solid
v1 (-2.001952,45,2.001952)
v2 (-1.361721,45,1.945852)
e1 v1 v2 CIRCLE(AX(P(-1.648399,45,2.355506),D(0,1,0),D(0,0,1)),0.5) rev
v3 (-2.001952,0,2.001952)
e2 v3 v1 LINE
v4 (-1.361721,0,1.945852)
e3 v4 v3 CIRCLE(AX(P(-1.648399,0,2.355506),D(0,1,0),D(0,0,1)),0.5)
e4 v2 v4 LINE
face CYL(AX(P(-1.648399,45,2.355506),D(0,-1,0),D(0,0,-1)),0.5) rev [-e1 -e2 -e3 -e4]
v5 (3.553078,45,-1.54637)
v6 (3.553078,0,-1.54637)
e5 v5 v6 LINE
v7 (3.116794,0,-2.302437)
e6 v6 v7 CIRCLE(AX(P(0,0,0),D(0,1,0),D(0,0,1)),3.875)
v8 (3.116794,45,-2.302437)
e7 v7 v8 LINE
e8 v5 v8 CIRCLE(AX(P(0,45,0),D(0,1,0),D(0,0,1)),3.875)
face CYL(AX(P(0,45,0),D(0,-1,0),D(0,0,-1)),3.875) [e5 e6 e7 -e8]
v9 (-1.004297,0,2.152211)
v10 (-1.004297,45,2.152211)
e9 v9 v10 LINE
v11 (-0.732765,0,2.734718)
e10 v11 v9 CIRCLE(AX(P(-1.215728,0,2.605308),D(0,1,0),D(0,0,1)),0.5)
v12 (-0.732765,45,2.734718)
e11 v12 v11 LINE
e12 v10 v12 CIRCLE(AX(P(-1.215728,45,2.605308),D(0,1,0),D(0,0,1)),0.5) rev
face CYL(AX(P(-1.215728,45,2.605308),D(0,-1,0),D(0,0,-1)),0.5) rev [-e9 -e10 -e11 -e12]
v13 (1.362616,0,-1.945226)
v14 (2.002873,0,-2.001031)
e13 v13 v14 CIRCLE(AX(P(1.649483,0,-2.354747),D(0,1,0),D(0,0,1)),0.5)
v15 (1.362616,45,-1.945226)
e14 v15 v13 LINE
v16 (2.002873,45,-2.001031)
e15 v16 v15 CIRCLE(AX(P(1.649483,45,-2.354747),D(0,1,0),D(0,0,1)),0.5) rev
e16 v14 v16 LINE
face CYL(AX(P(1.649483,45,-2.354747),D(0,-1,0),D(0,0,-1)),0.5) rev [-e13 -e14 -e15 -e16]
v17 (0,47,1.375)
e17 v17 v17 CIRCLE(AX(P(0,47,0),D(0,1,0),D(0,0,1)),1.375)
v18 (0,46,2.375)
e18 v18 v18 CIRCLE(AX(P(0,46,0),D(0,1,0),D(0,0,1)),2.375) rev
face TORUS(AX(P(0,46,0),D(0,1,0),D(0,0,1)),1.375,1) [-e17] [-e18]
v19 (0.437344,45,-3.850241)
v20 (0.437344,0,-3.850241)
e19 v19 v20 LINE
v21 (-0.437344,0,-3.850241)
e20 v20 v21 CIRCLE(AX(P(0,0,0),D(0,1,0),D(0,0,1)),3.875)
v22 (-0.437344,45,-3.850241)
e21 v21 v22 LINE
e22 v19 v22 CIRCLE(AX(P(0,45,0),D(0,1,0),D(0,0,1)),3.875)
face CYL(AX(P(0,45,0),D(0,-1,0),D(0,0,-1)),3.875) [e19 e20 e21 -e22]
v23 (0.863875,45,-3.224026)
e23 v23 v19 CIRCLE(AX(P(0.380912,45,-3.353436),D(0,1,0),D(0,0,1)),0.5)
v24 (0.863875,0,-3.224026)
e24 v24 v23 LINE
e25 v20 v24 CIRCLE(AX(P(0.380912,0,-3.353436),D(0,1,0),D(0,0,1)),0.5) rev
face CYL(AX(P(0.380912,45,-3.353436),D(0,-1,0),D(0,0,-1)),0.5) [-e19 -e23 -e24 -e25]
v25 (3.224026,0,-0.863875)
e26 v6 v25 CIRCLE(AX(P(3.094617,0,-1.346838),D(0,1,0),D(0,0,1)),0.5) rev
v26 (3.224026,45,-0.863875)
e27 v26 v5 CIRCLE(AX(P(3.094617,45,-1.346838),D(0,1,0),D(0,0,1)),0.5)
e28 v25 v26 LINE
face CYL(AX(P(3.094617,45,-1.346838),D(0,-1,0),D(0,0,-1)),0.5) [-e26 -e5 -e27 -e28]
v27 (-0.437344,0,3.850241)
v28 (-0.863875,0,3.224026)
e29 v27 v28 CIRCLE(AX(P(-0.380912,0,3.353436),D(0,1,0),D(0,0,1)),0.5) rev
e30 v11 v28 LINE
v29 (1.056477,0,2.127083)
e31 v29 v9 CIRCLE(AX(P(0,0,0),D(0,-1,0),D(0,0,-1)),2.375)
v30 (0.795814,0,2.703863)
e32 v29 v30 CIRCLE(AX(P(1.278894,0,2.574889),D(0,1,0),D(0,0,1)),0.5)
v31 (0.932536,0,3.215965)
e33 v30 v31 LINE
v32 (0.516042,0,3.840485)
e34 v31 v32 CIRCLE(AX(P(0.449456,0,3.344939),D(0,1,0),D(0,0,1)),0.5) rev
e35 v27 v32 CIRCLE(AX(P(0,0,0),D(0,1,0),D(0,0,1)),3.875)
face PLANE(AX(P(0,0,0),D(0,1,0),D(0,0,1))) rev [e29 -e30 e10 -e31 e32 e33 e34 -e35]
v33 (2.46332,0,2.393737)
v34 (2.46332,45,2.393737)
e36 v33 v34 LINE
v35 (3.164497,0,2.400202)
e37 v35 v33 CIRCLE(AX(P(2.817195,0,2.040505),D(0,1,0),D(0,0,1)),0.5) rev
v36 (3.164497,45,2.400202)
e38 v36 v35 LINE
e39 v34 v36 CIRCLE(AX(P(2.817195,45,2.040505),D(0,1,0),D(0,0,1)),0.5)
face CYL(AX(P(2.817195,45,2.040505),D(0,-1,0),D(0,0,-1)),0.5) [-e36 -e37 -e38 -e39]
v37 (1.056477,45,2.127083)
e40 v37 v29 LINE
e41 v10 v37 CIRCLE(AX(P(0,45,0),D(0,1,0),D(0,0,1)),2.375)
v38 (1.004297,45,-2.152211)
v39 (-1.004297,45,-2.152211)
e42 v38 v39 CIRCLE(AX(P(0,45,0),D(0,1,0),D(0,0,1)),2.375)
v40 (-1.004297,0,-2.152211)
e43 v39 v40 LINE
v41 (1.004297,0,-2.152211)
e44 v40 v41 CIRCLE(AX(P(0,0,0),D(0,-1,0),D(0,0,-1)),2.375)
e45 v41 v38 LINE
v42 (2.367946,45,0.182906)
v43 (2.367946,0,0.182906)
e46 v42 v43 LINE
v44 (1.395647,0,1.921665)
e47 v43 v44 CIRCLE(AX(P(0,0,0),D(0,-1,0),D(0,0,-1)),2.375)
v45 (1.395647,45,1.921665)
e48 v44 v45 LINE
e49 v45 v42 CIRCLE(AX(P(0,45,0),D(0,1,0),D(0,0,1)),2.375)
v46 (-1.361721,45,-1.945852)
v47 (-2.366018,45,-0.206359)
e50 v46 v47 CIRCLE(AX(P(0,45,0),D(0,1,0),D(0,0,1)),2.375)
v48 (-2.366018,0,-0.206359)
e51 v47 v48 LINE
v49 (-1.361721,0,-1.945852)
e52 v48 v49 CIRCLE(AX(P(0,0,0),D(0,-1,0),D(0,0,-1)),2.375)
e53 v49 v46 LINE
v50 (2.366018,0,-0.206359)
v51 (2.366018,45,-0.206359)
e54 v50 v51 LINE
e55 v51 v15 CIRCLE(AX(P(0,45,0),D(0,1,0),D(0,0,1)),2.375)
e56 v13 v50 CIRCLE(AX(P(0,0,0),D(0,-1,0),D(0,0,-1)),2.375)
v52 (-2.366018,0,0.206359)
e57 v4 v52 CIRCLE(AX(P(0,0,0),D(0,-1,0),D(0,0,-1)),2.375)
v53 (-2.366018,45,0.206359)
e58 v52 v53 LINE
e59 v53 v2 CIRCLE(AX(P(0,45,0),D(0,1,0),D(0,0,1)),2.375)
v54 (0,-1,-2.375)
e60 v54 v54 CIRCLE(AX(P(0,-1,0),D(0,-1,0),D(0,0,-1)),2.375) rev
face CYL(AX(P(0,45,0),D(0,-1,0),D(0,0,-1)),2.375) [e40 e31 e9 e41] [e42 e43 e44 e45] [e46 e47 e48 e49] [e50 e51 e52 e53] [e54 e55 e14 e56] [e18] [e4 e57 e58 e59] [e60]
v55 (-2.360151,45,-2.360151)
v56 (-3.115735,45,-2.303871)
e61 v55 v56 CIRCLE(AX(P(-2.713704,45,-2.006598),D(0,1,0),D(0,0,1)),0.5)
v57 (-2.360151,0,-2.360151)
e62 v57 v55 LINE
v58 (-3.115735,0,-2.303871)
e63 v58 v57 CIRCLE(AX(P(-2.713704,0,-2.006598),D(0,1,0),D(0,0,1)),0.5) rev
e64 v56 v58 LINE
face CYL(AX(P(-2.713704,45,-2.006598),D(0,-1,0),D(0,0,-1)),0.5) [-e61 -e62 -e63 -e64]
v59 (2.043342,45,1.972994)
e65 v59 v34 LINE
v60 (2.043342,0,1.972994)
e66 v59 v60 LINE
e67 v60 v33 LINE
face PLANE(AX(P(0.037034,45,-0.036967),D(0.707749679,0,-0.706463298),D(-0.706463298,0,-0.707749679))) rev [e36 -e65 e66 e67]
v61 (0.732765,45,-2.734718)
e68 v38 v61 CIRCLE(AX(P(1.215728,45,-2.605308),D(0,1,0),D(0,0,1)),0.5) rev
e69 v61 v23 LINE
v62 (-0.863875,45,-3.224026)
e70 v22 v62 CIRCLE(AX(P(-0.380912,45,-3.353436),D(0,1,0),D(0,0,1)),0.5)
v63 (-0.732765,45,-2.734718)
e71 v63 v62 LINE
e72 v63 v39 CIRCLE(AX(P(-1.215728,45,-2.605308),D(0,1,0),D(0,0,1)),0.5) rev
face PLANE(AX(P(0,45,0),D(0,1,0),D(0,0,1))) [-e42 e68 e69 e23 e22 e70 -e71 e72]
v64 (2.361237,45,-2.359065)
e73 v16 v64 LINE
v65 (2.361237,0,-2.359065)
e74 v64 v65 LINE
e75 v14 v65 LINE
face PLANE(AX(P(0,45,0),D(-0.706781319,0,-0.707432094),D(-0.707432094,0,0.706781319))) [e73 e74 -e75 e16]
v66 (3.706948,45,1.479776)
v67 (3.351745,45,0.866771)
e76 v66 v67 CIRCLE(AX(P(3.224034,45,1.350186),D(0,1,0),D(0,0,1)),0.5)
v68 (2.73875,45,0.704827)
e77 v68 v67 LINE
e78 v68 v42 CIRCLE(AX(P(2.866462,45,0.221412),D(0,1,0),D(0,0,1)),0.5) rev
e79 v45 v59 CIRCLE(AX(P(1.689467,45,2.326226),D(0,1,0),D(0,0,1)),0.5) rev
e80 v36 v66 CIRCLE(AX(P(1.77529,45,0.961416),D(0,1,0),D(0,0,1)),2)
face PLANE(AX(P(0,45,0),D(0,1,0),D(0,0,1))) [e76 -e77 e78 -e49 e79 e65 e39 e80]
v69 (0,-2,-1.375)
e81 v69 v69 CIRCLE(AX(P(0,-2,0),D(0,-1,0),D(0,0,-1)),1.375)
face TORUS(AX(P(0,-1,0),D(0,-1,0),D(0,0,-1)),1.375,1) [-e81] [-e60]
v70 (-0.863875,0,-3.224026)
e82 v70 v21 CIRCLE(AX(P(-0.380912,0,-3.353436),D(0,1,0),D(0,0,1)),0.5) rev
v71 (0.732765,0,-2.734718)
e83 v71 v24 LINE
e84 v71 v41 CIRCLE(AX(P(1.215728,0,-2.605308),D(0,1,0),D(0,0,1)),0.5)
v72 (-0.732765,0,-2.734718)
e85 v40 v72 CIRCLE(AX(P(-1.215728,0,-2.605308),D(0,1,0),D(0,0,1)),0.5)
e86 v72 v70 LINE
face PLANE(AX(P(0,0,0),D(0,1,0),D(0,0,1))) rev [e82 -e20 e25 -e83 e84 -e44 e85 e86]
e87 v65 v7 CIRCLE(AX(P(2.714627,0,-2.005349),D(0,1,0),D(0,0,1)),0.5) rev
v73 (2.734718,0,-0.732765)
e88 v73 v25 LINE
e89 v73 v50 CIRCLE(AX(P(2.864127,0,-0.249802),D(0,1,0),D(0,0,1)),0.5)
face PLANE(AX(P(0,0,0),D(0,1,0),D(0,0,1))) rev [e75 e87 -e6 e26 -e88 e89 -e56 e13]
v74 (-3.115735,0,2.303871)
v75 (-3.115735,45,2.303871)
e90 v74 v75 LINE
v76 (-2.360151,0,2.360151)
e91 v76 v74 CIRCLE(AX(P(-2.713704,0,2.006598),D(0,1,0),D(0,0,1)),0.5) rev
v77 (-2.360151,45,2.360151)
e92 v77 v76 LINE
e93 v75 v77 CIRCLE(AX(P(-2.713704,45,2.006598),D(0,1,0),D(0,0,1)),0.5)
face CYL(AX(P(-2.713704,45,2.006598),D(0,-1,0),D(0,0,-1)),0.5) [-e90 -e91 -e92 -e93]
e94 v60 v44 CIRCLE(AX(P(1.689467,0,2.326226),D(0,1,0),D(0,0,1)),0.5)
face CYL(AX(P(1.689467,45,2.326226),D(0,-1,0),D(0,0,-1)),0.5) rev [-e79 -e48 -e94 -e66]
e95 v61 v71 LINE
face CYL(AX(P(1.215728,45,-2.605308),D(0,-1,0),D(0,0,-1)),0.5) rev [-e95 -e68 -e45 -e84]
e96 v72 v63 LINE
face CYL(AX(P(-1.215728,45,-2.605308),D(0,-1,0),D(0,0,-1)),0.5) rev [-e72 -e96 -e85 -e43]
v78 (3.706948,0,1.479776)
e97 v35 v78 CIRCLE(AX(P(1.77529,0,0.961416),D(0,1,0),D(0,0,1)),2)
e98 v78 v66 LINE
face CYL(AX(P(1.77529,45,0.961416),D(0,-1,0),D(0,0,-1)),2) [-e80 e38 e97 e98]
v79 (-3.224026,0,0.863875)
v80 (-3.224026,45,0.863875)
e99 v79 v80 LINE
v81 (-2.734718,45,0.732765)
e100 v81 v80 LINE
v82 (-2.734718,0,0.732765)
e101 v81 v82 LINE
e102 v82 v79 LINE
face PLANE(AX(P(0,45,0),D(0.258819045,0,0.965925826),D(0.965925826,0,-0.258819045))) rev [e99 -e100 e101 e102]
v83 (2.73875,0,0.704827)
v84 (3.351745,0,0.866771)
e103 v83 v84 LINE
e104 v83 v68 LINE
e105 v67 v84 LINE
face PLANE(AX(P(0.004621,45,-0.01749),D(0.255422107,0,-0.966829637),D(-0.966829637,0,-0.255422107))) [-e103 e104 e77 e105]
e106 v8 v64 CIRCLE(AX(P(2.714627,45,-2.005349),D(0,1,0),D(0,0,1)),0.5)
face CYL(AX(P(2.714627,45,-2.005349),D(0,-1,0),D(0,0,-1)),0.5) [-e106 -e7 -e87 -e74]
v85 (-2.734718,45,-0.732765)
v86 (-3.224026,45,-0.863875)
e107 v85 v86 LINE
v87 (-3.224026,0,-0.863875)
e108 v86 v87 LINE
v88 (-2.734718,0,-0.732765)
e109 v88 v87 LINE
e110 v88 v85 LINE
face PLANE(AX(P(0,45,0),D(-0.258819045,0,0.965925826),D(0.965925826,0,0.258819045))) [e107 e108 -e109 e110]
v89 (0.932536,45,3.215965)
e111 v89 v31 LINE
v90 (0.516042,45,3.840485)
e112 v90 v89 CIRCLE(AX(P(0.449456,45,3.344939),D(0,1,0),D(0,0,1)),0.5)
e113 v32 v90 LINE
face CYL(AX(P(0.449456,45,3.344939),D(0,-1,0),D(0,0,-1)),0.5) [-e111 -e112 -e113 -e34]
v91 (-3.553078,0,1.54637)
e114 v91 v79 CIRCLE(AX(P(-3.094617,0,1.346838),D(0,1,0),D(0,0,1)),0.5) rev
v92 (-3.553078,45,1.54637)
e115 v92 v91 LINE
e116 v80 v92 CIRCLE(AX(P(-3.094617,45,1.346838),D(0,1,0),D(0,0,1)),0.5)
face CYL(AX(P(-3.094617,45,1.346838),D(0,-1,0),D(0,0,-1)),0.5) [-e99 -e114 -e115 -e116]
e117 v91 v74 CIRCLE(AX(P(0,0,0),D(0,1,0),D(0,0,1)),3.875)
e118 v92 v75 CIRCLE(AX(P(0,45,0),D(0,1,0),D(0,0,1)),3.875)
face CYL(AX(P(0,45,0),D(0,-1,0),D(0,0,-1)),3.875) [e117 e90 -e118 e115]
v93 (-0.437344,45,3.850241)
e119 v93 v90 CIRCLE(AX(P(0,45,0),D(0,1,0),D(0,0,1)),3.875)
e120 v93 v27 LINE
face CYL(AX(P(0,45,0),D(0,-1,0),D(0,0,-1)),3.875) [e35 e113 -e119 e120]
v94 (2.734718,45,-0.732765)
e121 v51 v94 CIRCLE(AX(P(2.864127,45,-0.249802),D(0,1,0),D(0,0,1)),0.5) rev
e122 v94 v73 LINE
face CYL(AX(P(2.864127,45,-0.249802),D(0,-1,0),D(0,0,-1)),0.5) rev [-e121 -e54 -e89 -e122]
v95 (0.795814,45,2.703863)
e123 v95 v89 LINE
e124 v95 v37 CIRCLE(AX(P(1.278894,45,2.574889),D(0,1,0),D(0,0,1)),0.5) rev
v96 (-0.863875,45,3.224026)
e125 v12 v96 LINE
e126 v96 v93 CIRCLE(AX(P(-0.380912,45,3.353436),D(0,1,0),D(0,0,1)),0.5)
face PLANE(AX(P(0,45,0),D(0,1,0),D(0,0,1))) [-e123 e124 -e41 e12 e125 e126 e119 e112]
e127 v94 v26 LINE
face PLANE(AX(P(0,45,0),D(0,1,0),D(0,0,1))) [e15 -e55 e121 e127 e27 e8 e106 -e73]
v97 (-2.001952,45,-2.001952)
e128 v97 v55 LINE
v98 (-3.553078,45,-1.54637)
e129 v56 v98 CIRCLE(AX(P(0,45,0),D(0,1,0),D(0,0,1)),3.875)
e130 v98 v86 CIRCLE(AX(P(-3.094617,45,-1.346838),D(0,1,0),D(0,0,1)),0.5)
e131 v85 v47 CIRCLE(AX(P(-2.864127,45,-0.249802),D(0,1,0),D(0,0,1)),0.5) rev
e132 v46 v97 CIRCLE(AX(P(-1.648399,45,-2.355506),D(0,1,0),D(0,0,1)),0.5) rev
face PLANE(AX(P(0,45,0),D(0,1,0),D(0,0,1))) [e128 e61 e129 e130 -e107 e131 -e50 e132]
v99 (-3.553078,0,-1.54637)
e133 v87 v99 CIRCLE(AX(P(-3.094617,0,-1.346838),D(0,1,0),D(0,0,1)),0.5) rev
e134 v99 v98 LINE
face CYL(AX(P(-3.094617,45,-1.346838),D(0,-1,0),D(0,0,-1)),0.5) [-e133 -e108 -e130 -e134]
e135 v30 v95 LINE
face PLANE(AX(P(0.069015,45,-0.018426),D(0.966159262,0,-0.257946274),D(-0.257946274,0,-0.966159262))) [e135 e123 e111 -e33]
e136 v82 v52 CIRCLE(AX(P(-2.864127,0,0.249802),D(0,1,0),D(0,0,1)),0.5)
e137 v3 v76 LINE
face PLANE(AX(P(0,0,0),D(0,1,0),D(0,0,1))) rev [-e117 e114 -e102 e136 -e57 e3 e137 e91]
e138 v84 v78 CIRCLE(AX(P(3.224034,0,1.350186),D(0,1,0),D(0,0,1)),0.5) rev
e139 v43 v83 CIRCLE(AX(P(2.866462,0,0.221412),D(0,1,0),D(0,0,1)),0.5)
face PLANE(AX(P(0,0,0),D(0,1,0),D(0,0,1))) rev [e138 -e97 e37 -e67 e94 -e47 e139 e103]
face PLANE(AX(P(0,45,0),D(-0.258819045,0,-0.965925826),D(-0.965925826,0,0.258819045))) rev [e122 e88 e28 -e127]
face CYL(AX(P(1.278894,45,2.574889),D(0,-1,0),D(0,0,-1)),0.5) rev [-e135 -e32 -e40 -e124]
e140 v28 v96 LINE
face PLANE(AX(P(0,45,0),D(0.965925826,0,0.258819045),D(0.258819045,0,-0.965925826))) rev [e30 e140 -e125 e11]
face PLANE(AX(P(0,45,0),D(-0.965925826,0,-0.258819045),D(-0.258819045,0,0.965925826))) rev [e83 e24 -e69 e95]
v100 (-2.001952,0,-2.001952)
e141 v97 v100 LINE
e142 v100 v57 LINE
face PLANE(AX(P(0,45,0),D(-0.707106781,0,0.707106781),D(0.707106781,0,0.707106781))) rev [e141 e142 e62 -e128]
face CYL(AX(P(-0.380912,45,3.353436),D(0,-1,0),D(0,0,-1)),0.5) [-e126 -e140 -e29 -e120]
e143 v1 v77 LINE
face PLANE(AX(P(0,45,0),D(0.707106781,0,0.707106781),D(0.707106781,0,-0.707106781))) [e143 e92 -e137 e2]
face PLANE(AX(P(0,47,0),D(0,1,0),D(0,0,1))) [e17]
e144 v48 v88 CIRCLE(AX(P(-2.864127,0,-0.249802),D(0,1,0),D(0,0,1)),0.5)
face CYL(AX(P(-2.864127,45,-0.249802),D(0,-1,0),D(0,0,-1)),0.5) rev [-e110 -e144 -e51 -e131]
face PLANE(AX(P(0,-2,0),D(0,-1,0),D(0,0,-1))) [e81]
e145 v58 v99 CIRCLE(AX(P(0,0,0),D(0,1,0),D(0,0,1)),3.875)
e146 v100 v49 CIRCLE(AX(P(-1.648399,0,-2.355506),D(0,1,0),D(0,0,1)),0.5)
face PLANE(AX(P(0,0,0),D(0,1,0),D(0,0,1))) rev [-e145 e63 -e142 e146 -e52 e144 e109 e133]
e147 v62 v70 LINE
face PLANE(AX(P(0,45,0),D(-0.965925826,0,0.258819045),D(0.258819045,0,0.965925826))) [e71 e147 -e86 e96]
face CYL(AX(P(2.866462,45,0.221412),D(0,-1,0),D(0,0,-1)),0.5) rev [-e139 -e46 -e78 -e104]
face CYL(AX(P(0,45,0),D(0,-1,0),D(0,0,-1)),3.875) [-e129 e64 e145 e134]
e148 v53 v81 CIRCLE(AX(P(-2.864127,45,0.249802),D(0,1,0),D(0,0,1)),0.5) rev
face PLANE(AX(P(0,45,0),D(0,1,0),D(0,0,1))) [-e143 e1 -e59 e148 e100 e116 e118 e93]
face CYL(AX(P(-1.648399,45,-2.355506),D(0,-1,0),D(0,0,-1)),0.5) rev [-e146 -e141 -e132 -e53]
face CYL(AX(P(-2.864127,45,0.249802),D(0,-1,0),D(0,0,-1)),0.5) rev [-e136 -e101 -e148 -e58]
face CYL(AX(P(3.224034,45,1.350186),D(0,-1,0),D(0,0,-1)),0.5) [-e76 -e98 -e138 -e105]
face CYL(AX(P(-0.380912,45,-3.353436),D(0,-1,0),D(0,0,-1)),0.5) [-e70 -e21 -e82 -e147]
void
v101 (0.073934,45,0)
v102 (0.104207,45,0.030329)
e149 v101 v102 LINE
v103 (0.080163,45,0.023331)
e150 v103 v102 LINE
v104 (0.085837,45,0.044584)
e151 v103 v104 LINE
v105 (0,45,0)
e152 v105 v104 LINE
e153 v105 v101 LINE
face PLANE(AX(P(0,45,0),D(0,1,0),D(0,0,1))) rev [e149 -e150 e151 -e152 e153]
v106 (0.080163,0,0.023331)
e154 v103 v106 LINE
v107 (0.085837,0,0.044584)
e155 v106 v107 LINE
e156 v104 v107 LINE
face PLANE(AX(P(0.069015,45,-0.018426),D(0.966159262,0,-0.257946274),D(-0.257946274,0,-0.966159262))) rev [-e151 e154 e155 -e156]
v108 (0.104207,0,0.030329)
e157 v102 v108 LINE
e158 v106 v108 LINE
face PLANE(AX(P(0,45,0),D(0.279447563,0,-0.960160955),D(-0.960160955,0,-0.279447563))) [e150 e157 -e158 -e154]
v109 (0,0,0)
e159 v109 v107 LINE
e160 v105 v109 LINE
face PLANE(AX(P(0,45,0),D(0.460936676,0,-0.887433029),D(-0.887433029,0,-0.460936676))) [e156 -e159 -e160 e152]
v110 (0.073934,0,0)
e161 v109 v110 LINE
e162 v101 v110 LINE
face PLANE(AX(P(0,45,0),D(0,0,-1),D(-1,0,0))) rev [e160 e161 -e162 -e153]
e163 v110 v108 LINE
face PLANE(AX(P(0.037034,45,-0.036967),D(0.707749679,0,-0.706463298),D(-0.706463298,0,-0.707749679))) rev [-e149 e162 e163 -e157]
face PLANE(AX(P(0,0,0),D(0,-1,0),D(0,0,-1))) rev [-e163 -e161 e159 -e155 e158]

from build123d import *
from build123d.topology import SkipClean

# Parameters (mm, degrees)
BOSS_EXTRUDE1_DEPTH = 45
SKETCH4_R           = 2.375
BOSS_EXTRUDE3_DEPTH = 2
FILLET1_R           = 0.5
BOSS_EXTRUDE5_START = 2
SKETCH6_R           = 2.375
BOSS_EXTRUDE5_DEPTH = 2
FILLET2_R           = 1


with BuildPart() as part:
    # Sketch2 → Boss-Extrude1 (new body)
    with BuildSketch(Plane(origin=(0, 0, 0), x_dir=(1, 0, 0), z_dir=(0, 1, 0))):
        with BuildLine():
            Line((3.775215965, -0.978645895), (2.300774305, -0.58912019))
            ThreePointArc((2.300774305, -0.58912019), (2.374963211, 0.013219106), (2.294073837, 0.614695232))
            Line((2.294073837, 0.614695232), (3.742962577, 1.0029238))
            ThreePointArc((3.742962577, 1.0029238), (3.356294138, 1.936727823), (2.741299364, 2.73877761))
            Line((2.741299364, 2.73877761), (1.680151223, 1.678605632))
            ThreePointArc((1.680151223, 1.678605632), (1.187973207, 2.056537055), (0.614695232, 2.294073837))
            Line((0.614695232, 2.294073837), (1.0029238, 3.742962577))
            ThreePointArc((1.0029238, 3.742962577), (0, 3.875), (-1.0029238, 3.742962577))
            Line((-1.0029238, 3.742962577), (-0.614695232, 2.294073837))
            ThreePointArc((-0.614695232, 2.294073837), (-1.1875, 2.056810334), (-1.679378605, 1.679378605))
            Line((-1.679378605, 1.679378605), (-2.740038777, 2.740038777))
            ThreePointArc((-2.740038777, 2.740038777), (-3.35584844, 1.9375), (-3.742962577, 1.0029238))
            Line((-3.742962577, 1.0029238), (-2.294073837, 0.614695232))
            ThreePointArc((-2.294073837, 0.614695232), (-2.375, 0), (-2.294073837, -0.614695232))
            Line((-2.294073837, -0.614695232), (-3.742962577, -1.0029238))
            ThreePointArc((-3.742962577, -1.0029238), (-3.35584844, -1.9375), (-2.740038777, -2.740038777))
            Line((-2.740038777, -2.740038777), (-1.679378605, -1.679378605))
            ThreePointArc((-1.679378605, -1.679378605), (-1.1875, -2.056810334), (-0.614695232, -2.294073837))
            Line((-0.614695232, -2.294073837), (-1.0029238, -3.742962577))
            ThreePointArc((-1.0029238, -3.742962577), (0.033967076, -3.874851125), (1.068386506, -3.724805401))
            Line((1.068386506, -3.724805401), (0.681359786, -2.275164575))
            ThreePointArc((0.681359786, -2.275164575), (1.238849907, -2.026296106), (1.714477211, -1.643530618))
            Line((1.714477211, -1.643530618), (2.767163136, -2.698133353))
            ThreePointArc((2.767163136, -2.698133353), (3.500652231, -1.972912562), (3.775215965, -0.978645895))
        make_face()
        Polygon((0.085836926, -0.044584082), (0, 0), (0.073933818, 0), (0.104207494, -0.030328801), (0.080162685, -0.023330742), align=None, mode=Mode.SUBTRACT)
    extrude(amount=BOSS_EXTRUDE1_DEPTH)

    # Sketch4 → Boss-Extrude3 (add)
    with BuildSketch(Plane(origin=(0, 45, 0), x_dir=(1, 0, 0), z_dir=(0, 1, 0))):
        with Locations(Location((0, 0, 0), (0, 0, 75))):
            Circle(SKETCH4_R)
    extrude(amount=BOSS_EXTRUDE3_DEPTH)

    # Fillet1
    # the kernel refuses this fillet: 0.5 mm, written as the material it adds along each edge
    with BuildSketch(Plane(origin=(-2.294073837, 0, 0.614695232), x_dir=(-0.1735157400494046, 0, -0.9848310961556339), z_dir=(0, 1, 0)), Plane(origin=(-1.679378605, 0, -1.679378605), x_dir=(0.7661308776829403, 0, -0.6426845869170722), z_dir=(0, 1, 0)), Plane(origin=(0.614695232, 0, -2.294073837), x_dir=(0.939646617732385, 0, 0.3421465092384974), z_dir=(0, 1, 0)), Plane(origin=(2.294073837, 0, -0.614695232), x_dir=(0.1735157400495284, 0, 0.9848310961556122), z_dir=(0, 1, 0)), Plane(origin=(-0.614695232, 0, 2.294073837), x_dir=(-0.9396466177323688, 0, -0.3421465092385419), z_dir=(0, 1, 0))) as fillet1_piece_1:
        with BuildLine():
            CenterArc((0.458270974, 0.498091484), FILLET1_R, 185.007705084, 79.984589832)
            Line((-0.03982051, 0.45444663), (0, 0))
            ThreePointArc((0, 0), (0.20731306, 0.00906545), (0.414626119, 0))
        make_face()
    extrude(amount=45)
    with BuildSketch(Plane(origin=(-2.294073837, 0, -0.614695232), x_dir=(-0.17351574004940104, 0, 0.9848310961556345), z_dir=(0, 1, 0)), Plane(origin=(-0.614695232, 0, -2.294073837), x_dir=(-0.9396466177323672, 0, 0.3421465092385461), z_dir=(0, 1, 0)), Plane(origin=(1.680151223, 0, -1.678605632), x_dir=(-0.7658350540129166, 0, -0.643037067395833), z_dir=(0, 1, 0))) as fillet1_piece_2:
        with BuildLine():
            CenterArc((0.458270974, -0.498091484), FILLET1_R, 95.007705084, 79.984589832)
            Line((-0.03982051, -0.45444663), (0, 0))
            ThreePointArc((0, 0), (0.20731306, -0.00906545), (0.414626119, 0))
        make_face()
    extrude(amount=45)
    with BuildSketch(Plane(origin=(2.300774305, 0, 0.58912019), x_dir=(0.9668296370387235, 0, 0.2554221073900419), z_dir=(0, 1, 0))) as fillet1_piece_3:
        with BuildLine():
            CenterArc((0.453002414, 0.5), FILLET1_R, 190.38170854, 79.61829146)
            ThreePointArc((-0.038812111, 0.409897433), (-0.010506812, 0.205791362), (0, 0))
            Line((0, 0), (0.453002414, 0))
        make_face()
    extrude(amount=45)
    with BuildSketch(Plane(origin=(1.714477211, 0, 1.643530618), x_dir=(0.7064632978713469, 0, 0.7077496794494086), z_dir=(0, 1, 0))) as fillet1_piece_4:
        with BuildLine():
            CenterArc((0.465508471, -0.5), FILLET1_R, 90, 81.041880237)
            ThreePointArc((-0.02839274, -0.422143763), (-0.00477723, -0.211705398), (0, 0))
            Line((0, 0), (0.465508471, 0))
        make_face()
    extrude(amount=45)
    with BuildSketch(Plane(origin=(0.681359786, 0, 2.275164575), x_dir=(0.25794627414893684, 0, 0.966159262053975), z_dir=(0, 1, 0))) as fillet1_piece_5:
        with BuildLine():
            CenterArc((0.443713653, 0.5), FILLET1_R, 191.464392376, 78.535607624)
            ThreePointArc((-0.046310555, 0.400620549), (-0.014636445, 0.201295026), (0, 0))
            Line((0, 0), (0.443713653, 0))
        make_face()
    extrude(amount=45)
    with BuildSketch(Plane(origin=(-1.679378605, 0, 1.679378605), x_dir=(-0.7071067811865471, 0, 0.707106781186548), z_dir=(0, 1, 0))) as fillet1_piece_6:
        with BuildLine():
            CenterArc((0.456187913, 0.5), FILLET1_R, 190.015410168, 79.984589832)
            ThreePointArc((-0.036192593, 0.413043478), (-0.00906545, 0.20731306), (0, 0))
            Line((0, 0), (0.456187913, 0))
        make_face()
    extrude(amount=45)
    # the kernel refuses this fillet: 0.5 mm, written as the material it takes off along each edge
    with BuildSketch(Plane(origin=(-2.740038777, -1.439160897, 2.740038777), x_dir=(-0.6526300069150477, 0, -0.7576767609436524), z_dir=(0, 1, 0)), Plane(origin=(-3.742962577, -1.439160897, -1.0029238), x_dir=(0.3298523193767966, 0, -0.9440325457322686), z_dir=(0, 1, 0)), Plane(origin=(2.741299364, -1.439160897, -2.73877761), x_dir=(0.652281279601926, 0, 0.7579769998363237), z_dir=(0, 1, 0))) as fillet1_2_piece_1:
        with BuildLine():
            CenterArc((0.538524723, -0.49861874), FILLET1_R, 85.740187873, 98.519624254)
            Line((0.039905983, -0.535758376), (0, 0))
            ThreePointArc((0, 0), (0.287832179, 0.010704768), (0.575664359, 0))
        make_face()
    extrude(amount=47.878321794, mode=Mode.SUBTRACT)
    with BuildSketch(Plane(origin=(-3.742962577, -1.439160897, 1.0029238), x_dir=(0.9659258262890679, 0, -0.2588190451025218), z_dir=(0, 1, 0)), Plane(origin=(-2.740038777, -1.439160897, -2.740038777), x_dir=(0.7071067811865476, 0, 0.7071067811865476), z_dir=(0, 1, 0)), Plane(origin=(3.742962577, -1.439160897, -1.0029238), x_dir=(-0.9659258262890681, 0, 0.25881904510252185), z_dir=(0, 1, 0)), Plane(origin=(-1.0029238, -1.439160897, 3.742962577), x_dir=(0.2588190451025216, 0, -0.9659258262890681), z_dir=(0, 1, 0))) as fillet1_2_piece_2:
        with BuildLine():
            CenterArc((0.537242519, -0.5), FILLET1_R, 90, 98.519624254)
            ThreePointArc((0.04275993, -0.574074074), (0.010704768, -0.287832179), (0, 0))
            Line((0, 0), (0.537242519, 0))
        make_face()
    extrude(amount=47.878321794, mode=Mode.SUBTRACT)
    with BuildSketch(Plane(origin=(-1.0029238, -1.439160897, -3.742962577), x_dir=(0.25881904510252174, 0, 0.965925826289068), z_dir=(0, 1, 0))) as fillet1_2_piece_3:
        with BuildLine():
            CenterArc((0.537242519, 0.5), FILLET1_R, 171.480375746, 98.519624254)
            ThreePointArc((0.04275993, 0.574074074), (0.010704768, 0.287832179), (0, 0))
            Line((0, 0), (0.537242519, 0))
        make_face()
    extrude(amount=47.878321794, mode=Mode.SUBTRACT)
    with BuildSketch(Plane(origin=(1.0029238, -1.439160897, -3.742962577), x_dir=(-0.9824823262918377, 0, -0.1863557847886099), z_dir=(0, 1, 0))) as fillet1_2_piece_4:
        with BuildLine():
            CenterArc((0.538524723, 0.49861874), FILLET1_R, 175.740187873, 98.519624254)
            Line((0.039905983, 0.535758376), (0, 0))
            ThreePointArc((0, 0), (0.287832179, -0.010704768), (0.575664359, 0))
        make_face()
    extrude(amount=47.878321794, mode=Mode.SUBTRACT)
    with BuildSketch(Plane(origin=(3.775215965, -1.264396568, 0.978645895), x_dir=(-0.9668296370387236, 0, -0.25542210739004173), z_dir=(0, 1, 0))) as fillet1_2_piece_5:
        with BuildLine():
            CenterArc((0.437999819, 0.5), FILLET1_R, 179.77718135, 90.22281865)
            ThreePointArc((-0.0619964, 0.501944455), (-0.046928547, 0.249004631), (0, 0))
            Line((0, 0), (0.437999819, 0))
        make_face()
    extrude(amount=47.528793137, mode=Mode.SUBTRACT)
    with BuildSketch(Plane(origin=(2.767163136, -1.241563867, 2.698133353), x_dir=(0.8000663385432955, 0, -0.5999115384203949), z_dir=(0, 1, 0))) as fillet1_2_piece_6:
        with BuildLine():
            CenterArc((0.434547354, 0.496131331), FILLET1_R, 188.084320914, 89.047719887)
            Line((-0.060483736, 0.425816179), (0, 0))
            ThreePointArc((0, 0), (0.248312773, -0.015474675), (0.496625547, 0))
        make_face()
    extrude(amount=47.483127735, mode=Mode.SUBTRACT)
    with BuildSketch(Plane(origin=(1.068386506, -1.410819518, 3.724805401), x_dir=(-0.9787647804449897, 0, 0.20498659605074468), z_dir=(0, 1, 0))) as fillet1_2_piece_7:
        with BuildLine():
            CenterArc((0.527919562, -0.498672678), FILLET1_R, 85.824226653, 97.295295094)
            Line((0.028660468, -0.525882193), (0, 0))
            ThreePointArc((0, 0), (0.282163904, 0.010286747), (0.564327807, 0))
        make_face()
    extrude(amount=47.821639036, mode=Mode.SUBTRACT)

    # Sketch6 → Boss-Extrude5 (add)
    with SkipClean():  # the faces are left unmerged after this step: merging them gives an invalid solid
        with BuildSketch(Plane.XZ.offset(BOSS_EXTRUDE5_START)):
            with Locations(Location((0, 0, 0), (0, 0, 270))):
                Circle(SKETCH6_R)
        extrude(amount=-BOSS_EXTRUDE5_DEPTH)

    # Fillet2
    fillet2_edges = [part.edges().sort_by_distance(p)[0] for p in [
        (-0.614695232, 47, 2.294073837),
        (0, -2, 2.375),
    ]]
    fillet(fillet2_edges, radius=FILLET2_R)


solid = part.part
